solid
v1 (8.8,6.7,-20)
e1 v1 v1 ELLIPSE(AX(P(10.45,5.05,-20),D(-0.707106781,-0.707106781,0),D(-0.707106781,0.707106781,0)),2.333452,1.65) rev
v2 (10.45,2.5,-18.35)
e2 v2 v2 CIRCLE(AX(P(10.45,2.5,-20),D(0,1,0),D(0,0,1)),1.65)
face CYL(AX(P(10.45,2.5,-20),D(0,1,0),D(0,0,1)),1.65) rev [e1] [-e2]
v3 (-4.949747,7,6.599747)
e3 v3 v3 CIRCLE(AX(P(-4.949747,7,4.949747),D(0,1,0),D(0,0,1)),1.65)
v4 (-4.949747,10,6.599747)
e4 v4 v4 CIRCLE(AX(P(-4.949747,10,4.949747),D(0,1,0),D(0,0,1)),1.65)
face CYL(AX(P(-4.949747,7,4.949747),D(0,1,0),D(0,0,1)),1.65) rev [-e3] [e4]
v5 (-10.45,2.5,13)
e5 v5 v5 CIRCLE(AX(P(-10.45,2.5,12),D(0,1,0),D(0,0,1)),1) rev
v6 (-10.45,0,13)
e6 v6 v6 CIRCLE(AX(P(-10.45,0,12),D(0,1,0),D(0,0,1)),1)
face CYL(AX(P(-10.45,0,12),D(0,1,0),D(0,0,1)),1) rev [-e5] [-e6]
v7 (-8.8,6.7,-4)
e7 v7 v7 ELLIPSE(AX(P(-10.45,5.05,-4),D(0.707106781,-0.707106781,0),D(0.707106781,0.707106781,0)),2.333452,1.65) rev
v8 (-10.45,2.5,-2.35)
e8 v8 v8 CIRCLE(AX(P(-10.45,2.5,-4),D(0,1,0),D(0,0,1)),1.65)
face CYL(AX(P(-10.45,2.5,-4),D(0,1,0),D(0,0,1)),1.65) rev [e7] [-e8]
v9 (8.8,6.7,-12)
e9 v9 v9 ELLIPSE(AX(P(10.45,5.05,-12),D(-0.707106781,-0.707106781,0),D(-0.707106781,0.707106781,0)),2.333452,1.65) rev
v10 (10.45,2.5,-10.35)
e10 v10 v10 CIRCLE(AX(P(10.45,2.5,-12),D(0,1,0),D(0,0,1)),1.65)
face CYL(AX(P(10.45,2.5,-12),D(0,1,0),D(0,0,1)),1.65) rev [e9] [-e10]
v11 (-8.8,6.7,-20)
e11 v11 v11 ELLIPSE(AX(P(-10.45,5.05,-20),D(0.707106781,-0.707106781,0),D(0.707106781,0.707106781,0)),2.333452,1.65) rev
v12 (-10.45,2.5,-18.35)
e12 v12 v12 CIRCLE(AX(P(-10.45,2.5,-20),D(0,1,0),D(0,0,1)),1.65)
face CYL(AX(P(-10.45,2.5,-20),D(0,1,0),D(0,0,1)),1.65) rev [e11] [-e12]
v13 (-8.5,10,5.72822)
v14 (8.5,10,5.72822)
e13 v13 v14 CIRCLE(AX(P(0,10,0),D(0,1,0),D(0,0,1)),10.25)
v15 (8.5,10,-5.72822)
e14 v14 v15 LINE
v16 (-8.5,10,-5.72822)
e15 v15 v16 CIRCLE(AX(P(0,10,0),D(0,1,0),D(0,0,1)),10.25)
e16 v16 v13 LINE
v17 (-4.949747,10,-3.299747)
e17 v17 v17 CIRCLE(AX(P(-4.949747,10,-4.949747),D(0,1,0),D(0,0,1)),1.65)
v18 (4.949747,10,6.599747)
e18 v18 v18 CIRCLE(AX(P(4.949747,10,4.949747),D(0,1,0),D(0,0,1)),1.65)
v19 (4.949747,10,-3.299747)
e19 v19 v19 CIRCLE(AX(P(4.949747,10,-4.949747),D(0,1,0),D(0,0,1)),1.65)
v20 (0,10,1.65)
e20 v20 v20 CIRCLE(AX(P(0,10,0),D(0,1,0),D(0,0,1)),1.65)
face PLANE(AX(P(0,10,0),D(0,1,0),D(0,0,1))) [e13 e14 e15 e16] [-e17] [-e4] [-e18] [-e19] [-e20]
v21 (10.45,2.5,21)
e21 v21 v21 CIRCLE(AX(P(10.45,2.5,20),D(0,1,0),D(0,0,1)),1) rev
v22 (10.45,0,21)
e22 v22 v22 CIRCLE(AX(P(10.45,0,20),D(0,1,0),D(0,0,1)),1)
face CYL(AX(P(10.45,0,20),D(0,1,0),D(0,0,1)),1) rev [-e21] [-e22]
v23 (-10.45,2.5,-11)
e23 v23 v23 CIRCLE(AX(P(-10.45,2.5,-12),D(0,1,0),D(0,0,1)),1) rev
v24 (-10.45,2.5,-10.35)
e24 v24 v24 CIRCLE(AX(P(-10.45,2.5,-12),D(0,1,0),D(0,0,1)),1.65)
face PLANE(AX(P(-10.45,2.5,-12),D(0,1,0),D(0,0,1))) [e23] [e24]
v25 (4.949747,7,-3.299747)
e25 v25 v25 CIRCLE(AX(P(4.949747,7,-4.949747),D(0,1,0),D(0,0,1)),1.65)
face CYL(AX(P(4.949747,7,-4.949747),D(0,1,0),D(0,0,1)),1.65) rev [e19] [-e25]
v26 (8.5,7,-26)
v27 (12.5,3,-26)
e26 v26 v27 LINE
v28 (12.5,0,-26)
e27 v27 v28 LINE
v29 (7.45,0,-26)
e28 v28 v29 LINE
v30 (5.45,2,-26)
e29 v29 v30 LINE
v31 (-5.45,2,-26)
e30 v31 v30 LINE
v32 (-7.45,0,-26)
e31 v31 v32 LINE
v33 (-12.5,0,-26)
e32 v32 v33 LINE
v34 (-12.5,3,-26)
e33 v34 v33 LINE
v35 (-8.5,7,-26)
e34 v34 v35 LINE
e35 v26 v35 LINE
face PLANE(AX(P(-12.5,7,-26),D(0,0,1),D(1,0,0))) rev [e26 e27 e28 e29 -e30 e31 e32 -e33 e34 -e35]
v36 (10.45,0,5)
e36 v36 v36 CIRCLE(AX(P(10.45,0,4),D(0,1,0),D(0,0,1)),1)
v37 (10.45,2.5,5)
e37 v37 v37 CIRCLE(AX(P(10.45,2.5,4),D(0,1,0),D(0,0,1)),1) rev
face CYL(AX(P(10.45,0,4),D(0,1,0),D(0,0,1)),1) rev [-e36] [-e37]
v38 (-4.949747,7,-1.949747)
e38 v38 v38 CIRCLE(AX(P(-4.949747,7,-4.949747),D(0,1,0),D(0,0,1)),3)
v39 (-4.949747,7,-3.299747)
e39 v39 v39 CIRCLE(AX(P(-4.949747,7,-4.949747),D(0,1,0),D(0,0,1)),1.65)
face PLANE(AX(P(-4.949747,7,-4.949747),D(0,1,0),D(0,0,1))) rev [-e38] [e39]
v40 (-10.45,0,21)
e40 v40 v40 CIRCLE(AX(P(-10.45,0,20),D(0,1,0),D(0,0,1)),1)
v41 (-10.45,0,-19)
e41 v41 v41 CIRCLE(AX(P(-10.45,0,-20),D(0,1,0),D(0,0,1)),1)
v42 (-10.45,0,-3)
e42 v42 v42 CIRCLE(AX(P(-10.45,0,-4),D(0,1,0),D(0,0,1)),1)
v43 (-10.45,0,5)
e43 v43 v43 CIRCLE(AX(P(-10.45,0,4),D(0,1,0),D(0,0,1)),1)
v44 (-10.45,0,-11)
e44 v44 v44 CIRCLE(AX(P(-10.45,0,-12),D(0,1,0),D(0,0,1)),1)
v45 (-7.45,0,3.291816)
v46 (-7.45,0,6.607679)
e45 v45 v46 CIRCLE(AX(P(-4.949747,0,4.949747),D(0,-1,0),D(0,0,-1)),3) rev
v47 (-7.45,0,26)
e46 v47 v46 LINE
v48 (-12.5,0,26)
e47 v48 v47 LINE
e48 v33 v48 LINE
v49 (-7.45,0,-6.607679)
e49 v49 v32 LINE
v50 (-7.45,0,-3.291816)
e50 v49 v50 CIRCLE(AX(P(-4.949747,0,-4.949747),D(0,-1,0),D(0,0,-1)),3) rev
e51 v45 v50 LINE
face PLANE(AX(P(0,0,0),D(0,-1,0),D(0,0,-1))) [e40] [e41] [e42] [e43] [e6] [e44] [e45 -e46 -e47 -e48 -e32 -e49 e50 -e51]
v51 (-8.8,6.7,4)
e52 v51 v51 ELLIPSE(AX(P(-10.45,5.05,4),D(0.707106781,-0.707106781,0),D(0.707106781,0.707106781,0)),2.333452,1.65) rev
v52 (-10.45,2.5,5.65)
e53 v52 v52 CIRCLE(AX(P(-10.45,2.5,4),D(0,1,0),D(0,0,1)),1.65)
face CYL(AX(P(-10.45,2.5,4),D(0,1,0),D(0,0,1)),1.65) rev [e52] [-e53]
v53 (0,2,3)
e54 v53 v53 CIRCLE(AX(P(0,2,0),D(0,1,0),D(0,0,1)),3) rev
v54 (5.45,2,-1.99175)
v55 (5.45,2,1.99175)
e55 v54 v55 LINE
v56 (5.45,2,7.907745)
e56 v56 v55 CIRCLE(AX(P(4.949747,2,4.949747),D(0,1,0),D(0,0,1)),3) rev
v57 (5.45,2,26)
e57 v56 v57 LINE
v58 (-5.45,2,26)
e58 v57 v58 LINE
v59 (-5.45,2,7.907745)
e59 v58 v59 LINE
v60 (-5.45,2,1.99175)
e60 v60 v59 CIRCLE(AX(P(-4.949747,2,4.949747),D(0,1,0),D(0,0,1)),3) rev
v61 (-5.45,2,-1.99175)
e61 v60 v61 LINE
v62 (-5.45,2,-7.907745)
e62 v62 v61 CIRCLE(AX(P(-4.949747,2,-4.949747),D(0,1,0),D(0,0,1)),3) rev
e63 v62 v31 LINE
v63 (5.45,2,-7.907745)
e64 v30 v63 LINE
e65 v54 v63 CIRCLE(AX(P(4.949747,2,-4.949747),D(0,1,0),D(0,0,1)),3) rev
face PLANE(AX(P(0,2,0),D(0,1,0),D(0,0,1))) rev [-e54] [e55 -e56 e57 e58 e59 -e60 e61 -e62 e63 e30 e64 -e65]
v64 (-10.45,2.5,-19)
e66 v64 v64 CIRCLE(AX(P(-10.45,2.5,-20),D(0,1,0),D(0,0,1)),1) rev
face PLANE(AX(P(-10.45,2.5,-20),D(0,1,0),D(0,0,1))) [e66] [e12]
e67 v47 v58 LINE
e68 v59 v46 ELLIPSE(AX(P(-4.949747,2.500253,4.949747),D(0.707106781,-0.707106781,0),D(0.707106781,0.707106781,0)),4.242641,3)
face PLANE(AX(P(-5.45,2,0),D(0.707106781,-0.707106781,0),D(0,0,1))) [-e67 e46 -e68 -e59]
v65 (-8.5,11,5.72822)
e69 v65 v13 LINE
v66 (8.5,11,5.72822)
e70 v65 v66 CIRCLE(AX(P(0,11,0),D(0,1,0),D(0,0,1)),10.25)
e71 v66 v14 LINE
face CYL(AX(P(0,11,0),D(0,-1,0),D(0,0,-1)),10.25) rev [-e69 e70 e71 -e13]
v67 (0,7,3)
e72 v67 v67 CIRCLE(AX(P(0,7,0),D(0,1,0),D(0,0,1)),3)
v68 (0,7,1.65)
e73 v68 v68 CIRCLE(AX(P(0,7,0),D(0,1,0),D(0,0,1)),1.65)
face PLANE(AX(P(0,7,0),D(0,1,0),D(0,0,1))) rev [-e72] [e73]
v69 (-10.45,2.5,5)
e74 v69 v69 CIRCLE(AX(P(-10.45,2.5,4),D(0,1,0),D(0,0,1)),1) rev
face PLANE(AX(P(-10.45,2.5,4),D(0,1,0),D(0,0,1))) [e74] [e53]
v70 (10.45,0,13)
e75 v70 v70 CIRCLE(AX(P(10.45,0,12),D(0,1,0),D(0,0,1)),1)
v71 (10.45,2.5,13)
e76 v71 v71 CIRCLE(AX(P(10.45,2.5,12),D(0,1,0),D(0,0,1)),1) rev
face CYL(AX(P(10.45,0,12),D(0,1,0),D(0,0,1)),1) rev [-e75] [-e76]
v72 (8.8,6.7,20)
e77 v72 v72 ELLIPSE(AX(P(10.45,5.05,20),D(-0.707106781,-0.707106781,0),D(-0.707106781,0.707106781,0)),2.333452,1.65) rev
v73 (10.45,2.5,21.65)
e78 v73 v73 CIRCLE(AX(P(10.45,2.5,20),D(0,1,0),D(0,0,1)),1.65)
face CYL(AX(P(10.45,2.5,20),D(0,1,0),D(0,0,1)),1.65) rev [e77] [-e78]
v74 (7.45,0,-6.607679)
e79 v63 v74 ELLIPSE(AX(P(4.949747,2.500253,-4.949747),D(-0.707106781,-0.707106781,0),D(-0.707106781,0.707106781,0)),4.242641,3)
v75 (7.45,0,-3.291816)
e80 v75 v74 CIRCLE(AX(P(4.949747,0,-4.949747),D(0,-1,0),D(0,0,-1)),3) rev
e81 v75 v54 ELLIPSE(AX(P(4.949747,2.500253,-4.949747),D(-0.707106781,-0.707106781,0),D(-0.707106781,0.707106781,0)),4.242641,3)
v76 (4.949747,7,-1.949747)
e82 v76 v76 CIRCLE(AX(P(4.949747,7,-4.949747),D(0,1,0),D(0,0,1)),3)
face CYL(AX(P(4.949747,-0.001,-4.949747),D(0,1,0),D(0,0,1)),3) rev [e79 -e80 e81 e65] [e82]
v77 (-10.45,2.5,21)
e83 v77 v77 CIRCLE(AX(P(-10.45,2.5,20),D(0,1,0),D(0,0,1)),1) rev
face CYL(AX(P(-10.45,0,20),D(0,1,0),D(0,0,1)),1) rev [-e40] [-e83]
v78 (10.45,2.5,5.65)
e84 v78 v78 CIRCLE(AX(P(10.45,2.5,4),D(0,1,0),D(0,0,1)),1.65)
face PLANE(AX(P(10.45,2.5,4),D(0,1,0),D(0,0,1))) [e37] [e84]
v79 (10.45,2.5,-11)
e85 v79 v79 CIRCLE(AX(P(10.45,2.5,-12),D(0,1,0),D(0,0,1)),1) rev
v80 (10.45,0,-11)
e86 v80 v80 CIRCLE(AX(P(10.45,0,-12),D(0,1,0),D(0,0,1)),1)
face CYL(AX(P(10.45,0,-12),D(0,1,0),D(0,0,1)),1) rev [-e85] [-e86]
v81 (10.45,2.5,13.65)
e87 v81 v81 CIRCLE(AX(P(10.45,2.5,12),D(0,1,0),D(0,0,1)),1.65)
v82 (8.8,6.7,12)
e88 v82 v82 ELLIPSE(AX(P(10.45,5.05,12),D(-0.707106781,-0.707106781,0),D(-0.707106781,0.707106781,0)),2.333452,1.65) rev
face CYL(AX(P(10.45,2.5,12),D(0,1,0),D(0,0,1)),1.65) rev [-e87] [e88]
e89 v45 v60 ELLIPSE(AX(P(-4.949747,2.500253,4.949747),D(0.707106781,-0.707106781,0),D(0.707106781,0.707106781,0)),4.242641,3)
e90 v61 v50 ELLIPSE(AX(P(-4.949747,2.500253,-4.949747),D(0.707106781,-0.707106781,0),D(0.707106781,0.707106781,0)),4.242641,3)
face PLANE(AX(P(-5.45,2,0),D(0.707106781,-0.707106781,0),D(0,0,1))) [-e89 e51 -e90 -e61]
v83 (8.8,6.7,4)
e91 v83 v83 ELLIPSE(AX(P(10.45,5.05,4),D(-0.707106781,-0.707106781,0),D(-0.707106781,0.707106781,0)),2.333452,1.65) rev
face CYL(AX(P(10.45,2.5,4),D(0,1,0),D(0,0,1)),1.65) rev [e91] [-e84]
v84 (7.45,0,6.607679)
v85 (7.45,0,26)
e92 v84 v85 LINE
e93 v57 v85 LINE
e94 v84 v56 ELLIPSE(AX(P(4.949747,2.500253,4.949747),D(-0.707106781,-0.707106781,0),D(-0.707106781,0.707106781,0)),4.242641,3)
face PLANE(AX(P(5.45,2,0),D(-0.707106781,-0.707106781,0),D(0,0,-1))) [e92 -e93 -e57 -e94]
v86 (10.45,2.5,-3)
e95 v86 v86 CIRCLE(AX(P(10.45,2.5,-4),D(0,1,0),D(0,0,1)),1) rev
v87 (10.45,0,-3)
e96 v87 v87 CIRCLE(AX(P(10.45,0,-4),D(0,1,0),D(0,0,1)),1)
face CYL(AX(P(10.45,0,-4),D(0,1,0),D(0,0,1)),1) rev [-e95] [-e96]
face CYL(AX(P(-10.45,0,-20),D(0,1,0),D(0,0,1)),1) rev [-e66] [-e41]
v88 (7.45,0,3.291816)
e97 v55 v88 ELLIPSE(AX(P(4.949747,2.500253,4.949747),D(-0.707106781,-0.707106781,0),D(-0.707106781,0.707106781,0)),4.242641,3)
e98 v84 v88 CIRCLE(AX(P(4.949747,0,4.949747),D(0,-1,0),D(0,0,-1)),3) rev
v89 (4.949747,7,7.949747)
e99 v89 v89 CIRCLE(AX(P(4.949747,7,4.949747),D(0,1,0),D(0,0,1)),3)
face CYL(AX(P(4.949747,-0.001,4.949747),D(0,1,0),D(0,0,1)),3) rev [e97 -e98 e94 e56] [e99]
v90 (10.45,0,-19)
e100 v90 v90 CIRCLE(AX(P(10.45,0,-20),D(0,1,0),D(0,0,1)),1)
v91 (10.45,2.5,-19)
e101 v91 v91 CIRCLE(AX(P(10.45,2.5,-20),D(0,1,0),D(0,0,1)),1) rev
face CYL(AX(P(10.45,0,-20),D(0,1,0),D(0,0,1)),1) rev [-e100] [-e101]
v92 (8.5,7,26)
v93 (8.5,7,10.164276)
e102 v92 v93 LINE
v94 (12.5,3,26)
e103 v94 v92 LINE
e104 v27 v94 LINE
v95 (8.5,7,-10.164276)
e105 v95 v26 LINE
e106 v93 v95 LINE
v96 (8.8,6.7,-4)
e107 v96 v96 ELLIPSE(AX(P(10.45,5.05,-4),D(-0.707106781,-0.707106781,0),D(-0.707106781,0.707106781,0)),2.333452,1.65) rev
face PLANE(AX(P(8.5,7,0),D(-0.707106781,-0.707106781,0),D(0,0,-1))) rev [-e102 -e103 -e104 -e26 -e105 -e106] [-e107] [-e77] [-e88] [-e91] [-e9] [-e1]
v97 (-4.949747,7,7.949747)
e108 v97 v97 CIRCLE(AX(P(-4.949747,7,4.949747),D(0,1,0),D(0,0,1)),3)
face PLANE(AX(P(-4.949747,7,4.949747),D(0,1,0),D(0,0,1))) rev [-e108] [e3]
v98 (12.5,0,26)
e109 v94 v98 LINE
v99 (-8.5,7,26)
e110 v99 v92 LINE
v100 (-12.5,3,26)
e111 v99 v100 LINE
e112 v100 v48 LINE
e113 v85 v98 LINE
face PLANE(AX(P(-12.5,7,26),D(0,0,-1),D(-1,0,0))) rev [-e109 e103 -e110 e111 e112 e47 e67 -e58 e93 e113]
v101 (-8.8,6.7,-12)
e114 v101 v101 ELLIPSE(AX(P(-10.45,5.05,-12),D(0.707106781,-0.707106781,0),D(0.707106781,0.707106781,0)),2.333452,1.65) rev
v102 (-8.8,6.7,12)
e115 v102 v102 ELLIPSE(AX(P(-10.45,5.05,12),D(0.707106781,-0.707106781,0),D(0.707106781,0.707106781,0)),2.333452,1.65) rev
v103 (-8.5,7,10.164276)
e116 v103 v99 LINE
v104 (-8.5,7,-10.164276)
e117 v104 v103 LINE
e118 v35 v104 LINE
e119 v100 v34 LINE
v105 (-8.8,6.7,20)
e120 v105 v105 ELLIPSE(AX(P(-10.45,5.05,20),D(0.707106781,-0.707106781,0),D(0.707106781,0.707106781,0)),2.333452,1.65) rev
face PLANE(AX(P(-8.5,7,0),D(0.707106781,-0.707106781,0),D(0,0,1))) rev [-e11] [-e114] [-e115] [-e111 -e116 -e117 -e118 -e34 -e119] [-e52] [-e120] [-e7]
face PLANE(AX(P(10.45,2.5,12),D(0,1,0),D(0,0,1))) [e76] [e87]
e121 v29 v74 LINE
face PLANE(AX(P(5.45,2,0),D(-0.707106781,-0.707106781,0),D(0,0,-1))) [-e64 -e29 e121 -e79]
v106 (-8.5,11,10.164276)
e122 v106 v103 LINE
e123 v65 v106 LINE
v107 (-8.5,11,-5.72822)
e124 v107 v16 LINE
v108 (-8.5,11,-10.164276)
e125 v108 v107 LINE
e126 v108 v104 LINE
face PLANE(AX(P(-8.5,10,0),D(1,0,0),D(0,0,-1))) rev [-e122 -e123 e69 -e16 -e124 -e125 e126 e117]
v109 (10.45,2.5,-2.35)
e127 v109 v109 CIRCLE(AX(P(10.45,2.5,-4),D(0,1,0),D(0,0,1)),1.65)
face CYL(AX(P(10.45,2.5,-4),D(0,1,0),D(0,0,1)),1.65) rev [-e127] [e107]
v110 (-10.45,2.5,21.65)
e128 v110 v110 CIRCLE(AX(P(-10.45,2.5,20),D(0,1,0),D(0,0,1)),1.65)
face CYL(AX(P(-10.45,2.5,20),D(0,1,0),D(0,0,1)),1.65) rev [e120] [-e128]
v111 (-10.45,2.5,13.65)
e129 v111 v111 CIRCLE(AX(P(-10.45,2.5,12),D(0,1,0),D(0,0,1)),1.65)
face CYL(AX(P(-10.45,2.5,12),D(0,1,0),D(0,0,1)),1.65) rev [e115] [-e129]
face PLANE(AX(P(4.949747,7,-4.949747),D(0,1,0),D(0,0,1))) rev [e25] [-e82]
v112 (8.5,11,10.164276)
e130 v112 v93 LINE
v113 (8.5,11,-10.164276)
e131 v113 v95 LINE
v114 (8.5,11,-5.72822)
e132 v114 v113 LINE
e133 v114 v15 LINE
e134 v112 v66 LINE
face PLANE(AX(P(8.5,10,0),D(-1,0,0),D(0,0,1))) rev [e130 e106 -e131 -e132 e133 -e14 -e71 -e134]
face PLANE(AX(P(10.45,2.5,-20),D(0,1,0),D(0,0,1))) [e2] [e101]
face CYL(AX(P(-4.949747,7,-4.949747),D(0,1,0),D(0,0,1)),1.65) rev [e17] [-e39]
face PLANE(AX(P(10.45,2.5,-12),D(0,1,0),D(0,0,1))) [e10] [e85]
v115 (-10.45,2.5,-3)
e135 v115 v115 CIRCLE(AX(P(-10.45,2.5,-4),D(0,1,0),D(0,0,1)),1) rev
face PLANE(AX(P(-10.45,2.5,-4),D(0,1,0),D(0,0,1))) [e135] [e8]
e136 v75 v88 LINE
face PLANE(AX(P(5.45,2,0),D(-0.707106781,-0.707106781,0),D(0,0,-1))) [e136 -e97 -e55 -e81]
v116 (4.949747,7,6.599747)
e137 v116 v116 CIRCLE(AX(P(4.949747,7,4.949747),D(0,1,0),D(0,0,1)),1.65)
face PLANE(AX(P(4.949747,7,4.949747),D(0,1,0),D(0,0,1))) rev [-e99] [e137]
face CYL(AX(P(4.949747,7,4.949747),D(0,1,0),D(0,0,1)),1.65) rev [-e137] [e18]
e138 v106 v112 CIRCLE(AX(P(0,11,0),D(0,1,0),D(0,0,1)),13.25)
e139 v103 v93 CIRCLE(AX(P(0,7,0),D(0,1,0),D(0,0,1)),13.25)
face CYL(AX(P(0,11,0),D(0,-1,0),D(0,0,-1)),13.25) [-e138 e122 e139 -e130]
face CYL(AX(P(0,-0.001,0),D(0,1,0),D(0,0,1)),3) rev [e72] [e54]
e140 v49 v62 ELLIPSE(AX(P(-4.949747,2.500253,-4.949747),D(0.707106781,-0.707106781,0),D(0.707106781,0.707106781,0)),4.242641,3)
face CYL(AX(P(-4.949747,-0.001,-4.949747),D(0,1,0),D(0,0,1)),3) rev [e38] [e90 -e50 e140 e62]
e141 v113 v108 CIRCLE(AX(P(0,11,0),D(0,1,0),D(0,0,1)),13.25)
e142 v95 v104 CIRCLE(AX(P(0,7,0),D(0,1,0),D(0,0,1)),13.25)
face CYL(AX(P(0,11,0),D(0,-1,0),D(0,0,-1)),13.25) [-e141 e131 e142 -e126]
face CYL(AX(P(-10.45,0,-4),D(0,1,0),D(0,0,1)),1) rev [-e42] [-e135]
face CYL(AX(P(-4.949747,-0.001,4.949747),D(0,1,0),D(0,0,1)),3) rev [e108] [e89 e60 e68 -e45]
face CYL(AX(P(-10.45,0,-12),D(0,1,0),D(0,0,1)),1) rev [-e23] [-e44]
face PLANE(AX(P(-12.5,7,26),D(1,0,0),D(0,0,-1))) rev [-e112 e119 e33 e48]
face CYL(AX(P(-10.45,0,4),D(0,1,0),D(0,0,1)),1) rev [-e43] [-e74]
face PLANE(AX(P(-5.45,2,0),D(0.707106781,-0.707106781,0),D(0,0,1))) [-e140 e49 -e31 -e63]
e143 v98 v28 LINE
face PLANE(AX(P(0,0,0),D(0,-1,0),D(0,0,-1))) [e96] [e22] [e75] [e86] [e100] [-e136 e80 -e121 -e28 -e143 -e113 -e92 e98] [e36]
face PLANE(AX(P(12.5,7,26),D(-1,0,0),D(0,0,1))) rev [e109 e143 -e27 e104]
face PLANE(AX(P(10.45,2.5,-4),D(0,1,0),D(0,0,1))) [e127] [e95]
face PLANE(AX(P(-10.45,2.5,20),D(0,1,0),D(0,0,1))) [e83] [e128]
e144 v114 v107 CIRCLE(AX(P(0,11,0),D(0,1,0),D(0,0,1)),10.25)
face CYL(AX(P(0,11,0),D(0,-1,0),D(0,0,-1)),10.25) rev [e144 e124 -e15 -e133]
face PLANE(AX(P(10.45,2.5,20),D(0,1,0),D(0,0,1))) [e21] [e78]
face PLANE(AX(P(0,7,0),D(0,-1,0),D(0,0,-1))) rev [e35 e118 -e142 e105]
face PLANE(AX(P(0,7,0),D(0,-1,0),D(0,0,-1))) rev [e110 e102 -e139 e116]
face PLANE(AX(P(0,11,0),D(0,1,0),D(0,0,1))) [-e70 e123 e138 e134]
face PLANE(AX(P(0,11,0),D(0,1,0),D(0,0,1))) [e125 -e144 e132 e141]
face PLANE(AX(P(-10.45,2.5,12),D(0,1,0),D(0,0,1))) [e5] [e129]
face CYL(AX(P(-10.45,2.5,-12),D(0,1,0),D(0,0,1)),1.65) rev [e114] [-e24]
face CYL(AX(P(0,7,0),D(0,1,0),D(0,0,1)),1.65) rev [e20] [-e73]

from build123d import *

# Parameters (mm, degrees)
SKETCH1_W           = 25
SKETCH1_H           = 52
BOSS_EXTRUDE1_DEPTH = 7
SKETCH2_R           = 1
CUT_EXTRUDE1_DEPTH  = 30.685855218
LPATTERN1_COUNT     = 6
LPATTERN1_PITCH     = 8
CHAMFER2_SIZE       = 4
SKETCH10_W          = 14.9
SKETCH10_H          = 52
CUT_EXTRUDE4_DEPTH  = 2
CHAMFER3_SIZE       = 2
BOSS_EXTRUDE2_DEPTH = 3
BOSS_EXTRUDE3_DEPTH = 4
SKETCH13_R          = 1.65
CUT_EXTRUDE5_DEPTH  = 3
CUT_EXTRUDE6_REACH  = 31.686
SKETCH14_R          = 3
SKETCH16_R          = 1.65
CUT_EXTRUDE7_DEPTH  = 4.5


# Some blends are built 0.0001 mm under size
with BuildPart() as part:
    # Sketch1 → Boss-Extrude1 (new body)
    with BuildSketch(Plane(origin=(0, 0, 0), x_dir=(1, 0, 0), z_dir=(0, 1, 0))):
        Rectangle(SKETCH1_W, SKETCH1_H)
    extrude(amount=BOSS_EXTRUDE1_DEPTH)

    # Sketch2 → Cut-Extrude1 (cut, through all)
    with BuildSketch(Plane(origin=(0, 7, 0), x_dir=(1, 0, 0), z_dir=(0, 1, 0))):
        with Locations(Location((-10.45, -20, 0), (0, 0, 270))):
            Circle(SKETCH2_R)
        with Locations(Location((10.45, -20, 0), (0, 0, 270))):
            Circle(SKETCH2_R)
    cut_extrude1 = extrude(amount=-CUT_EXTRUDE1_DEPTH, mode=Mode.SUBTRACT)

    # LPattern1: Cut-Extrude1 ×6
    with Locations(*[(0, 0, -i * LPATTERN1_PITCH) for i in range(1, LPATTERN1_COUNT)]):
        add(cut_extrude1, mode=Mode.SUBTRACT)

    # Chamfer2
    # the kernel refuses this chamfer: 4 mm, written as the material it takes off along each edge
    with BuildSketch(Plane(origin=(-12.5, 7, -36.286731952), x_dir=(-0.027495876610586487, -0.9996219169112968, 0), z_dir=(0, 0, 1)), Plane(origin=(12.5, 7, 36.286731952), x_dir=(0.027495876610586487, -0.9996219169112968, 0), z_dir=(0, 0, -1))) as chamfer2_piece_1:
        Polygon((CHAMFER2_SIZE * 0.999621916911, CHAMFER2_SIZE * 0.0274958766106), (-CHAMFER2_SIZE * 0.0274958766106, CHAMFER2_SIZE * 0.999621916911), (0, 0), align=None)
    extrude(amount=72.573463904, mode=Mode.SUBTRACT)

    # Sketch10 → Cut-Extrude4 (cut)
    with BuildSketch(Plane.XZ):
        Rectangle(SKETCH10_W, SKETCH10_H)
    extrude(amount=-CUT_EXTRUDE4_DEPTH, mode=Mode.SUBTRACT)

    # Chamfer3
    chamfer3_edges = [part.edges().sort_by_distance(p)[0] for p in [
        (7.45, 2, 0),
        (-7.45, 2, 0),
    ]]
    chamfer(chamfer3_edges, length=CHAMFER3_SIZE - 0.0001)  # a hair under: the kernel refuses the full size

    # Sketch12 → Boss-Extrude2 (add)
    with BuildSketch(Plane(origin=(0, 7, 0), x_dir=(1, 0, 0), z_dir=(0, 1, 0))):
        with BuildLine():
            ThreePointArc((8.5, 5.728219619), (0, 10.25), (-8.5, 5.728219619))
            Line((-8.5, 5.728219619), (-8.5, -5.728219619))
            ThreePointArc((-8.5, -5.728219619), (0, -10.25), (8.5, -5.728219619))
            Line((8.5, -5.728219619), (8.5, 5.728219619))
        make_face()
    extrude(amount=BOSS_EXTRUDE2_DEPTH)

    # Sketch12<3> → Boss-Extrude3 (add)
    with BuildSketch(Plane(origin=(0, 7, 0), x_dir=(1, 0, 0), z_dir=(0, 1, 0))):
        with BuildLine():
            ThreePointArc((8.5, 10.164275675), (0, 13.25), (-8.5, 10.164275675))
            Line((-8.5, 10.164275675), (-8.5, 5.728219619))
            ThreePointArc((-8.5, 5.728219619), (0, 10.25), (8.5, 5.728219619))
            Line((8.5, 5.728219619), (8.5, 10.164275675))
        make_face()
        with BuildLine():
            Line((-8.5, -5.728219619), (-8.5, -10.164275675))
            ThreePointArc((-8.5, -10.164275675), (0, -13.25), (8.5, -10.164275675))
            Line((8.5, -10.164275675), (8.5, -5.728219619))
            ThreePointArc((8.5, -5.728219619), (0, -10.25), (-8.5, -5.728219619))
        make_face()
    extrude(amount=BOSS_EXTRUDE3_DEPTH)

    # Sketch13 → Cut-Extrude5 (cut)
    with BuildSketch(Plane(origin=(0, 10, 0), x_dir=(1, 0, 0), z_dir=(0, 1, 0))):
        with Locations(Location((-4.949747468, 4.949747468, 0), (0, 0, 270))):
            Circle(SKETCH13_R)
        with Locations(Location((4.949747468, 4.949747468, 0), (0, 0, 270))):
            Circle(SKETCH13_R)
        with Locations(Location((4.949747468, -4.949747468, 0), (0, 0, 270))):
            Circle(SKETCH13_R)
        with Locations(Location((-4.949747468, -4.949747468, 0), (0, 0, 270))):
            Circle(SKETCH13_R)
        with Locations(Location((0, 0, 0), (0, 0, 270))):
            Circle(SKETCH13_R)
    extrude(amount=-CUT_EXTRUDE5_DEPTH, mode=Mode.SUBTRACT)

    # Sketch14 → Cut-Extrude6 (cut, up to next)
    with BuildSketch(Plane(origin=(0, 7, 0), x_dir=(1, 0, 0), z_dir=(0, 1, 0)), mode=Mode.PRIVATE) as cut_extrude6_sk1:
        with Locations(Location((-4.949747468, 4.949747468, 0), (0, 0, 270))):
            Circle(SKETCH14_R)
    cut_extrude6_tool1 = extrude(cut_extrude6_sk1.sketch, amount=-CUT_EXTRUDE6_REACH, mode=Mode.PRIVATE) & part.part
    # Sketch14 → Cut-Extrude6 (cut, up to next)
    with BuildSketch(Plane(origin=(0, 7, 0), x_dir=(1, 0, 0), z_dir=(0, 1, 0)), mode=Mode.PRIVATE) as cut_extrude6_sk2:
        with Locations(Location((4.949747468, 4.949747468, 0), (0, 0, 270))):
            Circle(SKETCH14_R)
    cut_extrude6_tool2 = extrude(cut_extrude6_sk2.sketch, amount=-CUT_EXTRUDE6_REACH, mode=Mode.PRIVATE) & part.part
    # Sketch14 → Cut-Extrude6 (cut, up to next)
    with BuildSketch(Plane(origin=(0, 7, 0), x_dir=(1, 0, 0), z_dir=(0, 1, 0)), mode=Mode.PRIVATE) as cut_extrude6_sk3:
        with Locations(Location((4.949747468, -4.949747468, 0), (0, 0, 270))):
            Circle(SKETCH14_R)
    cut_extrude6_tool3 = extrude(cut_extrude6_sk3.sketch, amount=-CUT_EXTRUDE6_REACH, mode=Mode.PRIVATE) & part.part
    # Sketch14 → Cut-Extrude6 (cut, up to next)
    with BuildSketch(Plane(origin=(0, 7, 0), x_dir=(1, 0, 0), z_dir=(0, 1, 0)), mode=Mode.PRIVATE) as cut_extrude6_sk4:
        with Locations(Location((-4.949747468, -4.949747468, 0), (0, 0, 270))):
            Circle(SKETCH14_R)
    cut_extrude6_tool4 = extrude(cut_extrude6_sk4.sketch, amount=-CUT_EXTRUDE6_REACH, mode=Mode.PRIVATE) & part.part
    # Sketch14 → Cut-Extrude6 (cut, up to next)
    with BuildSketch(Plane(origin=(0, 7, 0), x_dir=(1, 0, 0), z_dir=(0, 1, 0)), mode=Mode.PRIVATE) as cut_extrude6_sk5:
        with Locations(Location((0, 0, 0), (0, 0, 270))):
            Circle(SKETCH14_R)
    cut_extrude6_tool5 = extrude(cut_extrude6_sk5.sketch, amount=-CUT_EXTRUDE6_REACH, mode=Mode.PRIVATE) & part.part
    add(cut_extrude6_tool1.solids().sort_by_distance((-4.949747, 7, -4.949747))[0], mode=Mode.SUBTRACT)
    add(cut_extrude6_tool2.solids().sort_by_distance((4.949747, 7, -4.949747))[0], mode=Mode.SUBTRACT)
    add(cut_extrude6_tool3.solids().sort_by_distance((4.949747, 7, 4.949747))[0], mode=Mode.SUBTRACT)
    add(cut_extrude6_tool4.solids().sort_by_distance((-4.949747, 7, 4.949747))[0], mode=Mode.SUBTRACT)
    add(cut_extrude6_tool5.solids().sort_by_distance((0, 7, 0))[0], mode=Mode.SUBTRACT)

    # Sketch16 → Cut-Extrude7 (cut)
    with BuildSketch(Plane(origin=(0, 7, 0), x_dir=(1, 0, 0), z_dir=(0, 1, 0))):
        with Locations(Location((-10.45, -20, 0), (0, 0, 270))):
            Circle(SKETCH16_R)
        with Locations(Location((10.45, -20, 0), (0, 0, 270))):
            Circle(SKETCH16_R)
        with Locations(Location((10.45, -12, 0), (0, 0, 270))):
            Circle(SKETCH16_R)
        with Locations(Location((-10.45, -12, 0), (0, 0, 270))):
            Circle(SKETCH16_R)
        with Locations(Location((10.45, -4, 0), (0, 0, 270))):
            Circle(SKETCH16_R)
        with Locations(Location((-10.45, -4, 0), (0, 0, 270))):
            Circle(SKETCH16_R)
        with Locations(Location((10.45, 4, 0), (0, 0, 270))):
            Circle(SKETCH16_R)
        with Locations(Location((-10.45, 4, 0), (0, 0, 270))):
            Circle(SKETCH16_R)
        with Locations(Location((10.45, 12, 0), (0, 0, 270))):
            Circle(SKETCH16_R)
        with Locations(Location((-10.45, 12, 0), (0, 0, 270))):
            Circle(SKETCH16_R)
        with Locations(Location((10.45, 20, 0), (0, 0, 270))):
            Circle(SKETCH16_R)
        with Locations(Location((-10.45, 20, 0), (0, 0, 270))):
            Circle(SKETCH16_R)
    extrude(amount=-CUT_EXTRUDE7_DEPTH, mode=Mode.SUBTRACT)


solid = part.part
